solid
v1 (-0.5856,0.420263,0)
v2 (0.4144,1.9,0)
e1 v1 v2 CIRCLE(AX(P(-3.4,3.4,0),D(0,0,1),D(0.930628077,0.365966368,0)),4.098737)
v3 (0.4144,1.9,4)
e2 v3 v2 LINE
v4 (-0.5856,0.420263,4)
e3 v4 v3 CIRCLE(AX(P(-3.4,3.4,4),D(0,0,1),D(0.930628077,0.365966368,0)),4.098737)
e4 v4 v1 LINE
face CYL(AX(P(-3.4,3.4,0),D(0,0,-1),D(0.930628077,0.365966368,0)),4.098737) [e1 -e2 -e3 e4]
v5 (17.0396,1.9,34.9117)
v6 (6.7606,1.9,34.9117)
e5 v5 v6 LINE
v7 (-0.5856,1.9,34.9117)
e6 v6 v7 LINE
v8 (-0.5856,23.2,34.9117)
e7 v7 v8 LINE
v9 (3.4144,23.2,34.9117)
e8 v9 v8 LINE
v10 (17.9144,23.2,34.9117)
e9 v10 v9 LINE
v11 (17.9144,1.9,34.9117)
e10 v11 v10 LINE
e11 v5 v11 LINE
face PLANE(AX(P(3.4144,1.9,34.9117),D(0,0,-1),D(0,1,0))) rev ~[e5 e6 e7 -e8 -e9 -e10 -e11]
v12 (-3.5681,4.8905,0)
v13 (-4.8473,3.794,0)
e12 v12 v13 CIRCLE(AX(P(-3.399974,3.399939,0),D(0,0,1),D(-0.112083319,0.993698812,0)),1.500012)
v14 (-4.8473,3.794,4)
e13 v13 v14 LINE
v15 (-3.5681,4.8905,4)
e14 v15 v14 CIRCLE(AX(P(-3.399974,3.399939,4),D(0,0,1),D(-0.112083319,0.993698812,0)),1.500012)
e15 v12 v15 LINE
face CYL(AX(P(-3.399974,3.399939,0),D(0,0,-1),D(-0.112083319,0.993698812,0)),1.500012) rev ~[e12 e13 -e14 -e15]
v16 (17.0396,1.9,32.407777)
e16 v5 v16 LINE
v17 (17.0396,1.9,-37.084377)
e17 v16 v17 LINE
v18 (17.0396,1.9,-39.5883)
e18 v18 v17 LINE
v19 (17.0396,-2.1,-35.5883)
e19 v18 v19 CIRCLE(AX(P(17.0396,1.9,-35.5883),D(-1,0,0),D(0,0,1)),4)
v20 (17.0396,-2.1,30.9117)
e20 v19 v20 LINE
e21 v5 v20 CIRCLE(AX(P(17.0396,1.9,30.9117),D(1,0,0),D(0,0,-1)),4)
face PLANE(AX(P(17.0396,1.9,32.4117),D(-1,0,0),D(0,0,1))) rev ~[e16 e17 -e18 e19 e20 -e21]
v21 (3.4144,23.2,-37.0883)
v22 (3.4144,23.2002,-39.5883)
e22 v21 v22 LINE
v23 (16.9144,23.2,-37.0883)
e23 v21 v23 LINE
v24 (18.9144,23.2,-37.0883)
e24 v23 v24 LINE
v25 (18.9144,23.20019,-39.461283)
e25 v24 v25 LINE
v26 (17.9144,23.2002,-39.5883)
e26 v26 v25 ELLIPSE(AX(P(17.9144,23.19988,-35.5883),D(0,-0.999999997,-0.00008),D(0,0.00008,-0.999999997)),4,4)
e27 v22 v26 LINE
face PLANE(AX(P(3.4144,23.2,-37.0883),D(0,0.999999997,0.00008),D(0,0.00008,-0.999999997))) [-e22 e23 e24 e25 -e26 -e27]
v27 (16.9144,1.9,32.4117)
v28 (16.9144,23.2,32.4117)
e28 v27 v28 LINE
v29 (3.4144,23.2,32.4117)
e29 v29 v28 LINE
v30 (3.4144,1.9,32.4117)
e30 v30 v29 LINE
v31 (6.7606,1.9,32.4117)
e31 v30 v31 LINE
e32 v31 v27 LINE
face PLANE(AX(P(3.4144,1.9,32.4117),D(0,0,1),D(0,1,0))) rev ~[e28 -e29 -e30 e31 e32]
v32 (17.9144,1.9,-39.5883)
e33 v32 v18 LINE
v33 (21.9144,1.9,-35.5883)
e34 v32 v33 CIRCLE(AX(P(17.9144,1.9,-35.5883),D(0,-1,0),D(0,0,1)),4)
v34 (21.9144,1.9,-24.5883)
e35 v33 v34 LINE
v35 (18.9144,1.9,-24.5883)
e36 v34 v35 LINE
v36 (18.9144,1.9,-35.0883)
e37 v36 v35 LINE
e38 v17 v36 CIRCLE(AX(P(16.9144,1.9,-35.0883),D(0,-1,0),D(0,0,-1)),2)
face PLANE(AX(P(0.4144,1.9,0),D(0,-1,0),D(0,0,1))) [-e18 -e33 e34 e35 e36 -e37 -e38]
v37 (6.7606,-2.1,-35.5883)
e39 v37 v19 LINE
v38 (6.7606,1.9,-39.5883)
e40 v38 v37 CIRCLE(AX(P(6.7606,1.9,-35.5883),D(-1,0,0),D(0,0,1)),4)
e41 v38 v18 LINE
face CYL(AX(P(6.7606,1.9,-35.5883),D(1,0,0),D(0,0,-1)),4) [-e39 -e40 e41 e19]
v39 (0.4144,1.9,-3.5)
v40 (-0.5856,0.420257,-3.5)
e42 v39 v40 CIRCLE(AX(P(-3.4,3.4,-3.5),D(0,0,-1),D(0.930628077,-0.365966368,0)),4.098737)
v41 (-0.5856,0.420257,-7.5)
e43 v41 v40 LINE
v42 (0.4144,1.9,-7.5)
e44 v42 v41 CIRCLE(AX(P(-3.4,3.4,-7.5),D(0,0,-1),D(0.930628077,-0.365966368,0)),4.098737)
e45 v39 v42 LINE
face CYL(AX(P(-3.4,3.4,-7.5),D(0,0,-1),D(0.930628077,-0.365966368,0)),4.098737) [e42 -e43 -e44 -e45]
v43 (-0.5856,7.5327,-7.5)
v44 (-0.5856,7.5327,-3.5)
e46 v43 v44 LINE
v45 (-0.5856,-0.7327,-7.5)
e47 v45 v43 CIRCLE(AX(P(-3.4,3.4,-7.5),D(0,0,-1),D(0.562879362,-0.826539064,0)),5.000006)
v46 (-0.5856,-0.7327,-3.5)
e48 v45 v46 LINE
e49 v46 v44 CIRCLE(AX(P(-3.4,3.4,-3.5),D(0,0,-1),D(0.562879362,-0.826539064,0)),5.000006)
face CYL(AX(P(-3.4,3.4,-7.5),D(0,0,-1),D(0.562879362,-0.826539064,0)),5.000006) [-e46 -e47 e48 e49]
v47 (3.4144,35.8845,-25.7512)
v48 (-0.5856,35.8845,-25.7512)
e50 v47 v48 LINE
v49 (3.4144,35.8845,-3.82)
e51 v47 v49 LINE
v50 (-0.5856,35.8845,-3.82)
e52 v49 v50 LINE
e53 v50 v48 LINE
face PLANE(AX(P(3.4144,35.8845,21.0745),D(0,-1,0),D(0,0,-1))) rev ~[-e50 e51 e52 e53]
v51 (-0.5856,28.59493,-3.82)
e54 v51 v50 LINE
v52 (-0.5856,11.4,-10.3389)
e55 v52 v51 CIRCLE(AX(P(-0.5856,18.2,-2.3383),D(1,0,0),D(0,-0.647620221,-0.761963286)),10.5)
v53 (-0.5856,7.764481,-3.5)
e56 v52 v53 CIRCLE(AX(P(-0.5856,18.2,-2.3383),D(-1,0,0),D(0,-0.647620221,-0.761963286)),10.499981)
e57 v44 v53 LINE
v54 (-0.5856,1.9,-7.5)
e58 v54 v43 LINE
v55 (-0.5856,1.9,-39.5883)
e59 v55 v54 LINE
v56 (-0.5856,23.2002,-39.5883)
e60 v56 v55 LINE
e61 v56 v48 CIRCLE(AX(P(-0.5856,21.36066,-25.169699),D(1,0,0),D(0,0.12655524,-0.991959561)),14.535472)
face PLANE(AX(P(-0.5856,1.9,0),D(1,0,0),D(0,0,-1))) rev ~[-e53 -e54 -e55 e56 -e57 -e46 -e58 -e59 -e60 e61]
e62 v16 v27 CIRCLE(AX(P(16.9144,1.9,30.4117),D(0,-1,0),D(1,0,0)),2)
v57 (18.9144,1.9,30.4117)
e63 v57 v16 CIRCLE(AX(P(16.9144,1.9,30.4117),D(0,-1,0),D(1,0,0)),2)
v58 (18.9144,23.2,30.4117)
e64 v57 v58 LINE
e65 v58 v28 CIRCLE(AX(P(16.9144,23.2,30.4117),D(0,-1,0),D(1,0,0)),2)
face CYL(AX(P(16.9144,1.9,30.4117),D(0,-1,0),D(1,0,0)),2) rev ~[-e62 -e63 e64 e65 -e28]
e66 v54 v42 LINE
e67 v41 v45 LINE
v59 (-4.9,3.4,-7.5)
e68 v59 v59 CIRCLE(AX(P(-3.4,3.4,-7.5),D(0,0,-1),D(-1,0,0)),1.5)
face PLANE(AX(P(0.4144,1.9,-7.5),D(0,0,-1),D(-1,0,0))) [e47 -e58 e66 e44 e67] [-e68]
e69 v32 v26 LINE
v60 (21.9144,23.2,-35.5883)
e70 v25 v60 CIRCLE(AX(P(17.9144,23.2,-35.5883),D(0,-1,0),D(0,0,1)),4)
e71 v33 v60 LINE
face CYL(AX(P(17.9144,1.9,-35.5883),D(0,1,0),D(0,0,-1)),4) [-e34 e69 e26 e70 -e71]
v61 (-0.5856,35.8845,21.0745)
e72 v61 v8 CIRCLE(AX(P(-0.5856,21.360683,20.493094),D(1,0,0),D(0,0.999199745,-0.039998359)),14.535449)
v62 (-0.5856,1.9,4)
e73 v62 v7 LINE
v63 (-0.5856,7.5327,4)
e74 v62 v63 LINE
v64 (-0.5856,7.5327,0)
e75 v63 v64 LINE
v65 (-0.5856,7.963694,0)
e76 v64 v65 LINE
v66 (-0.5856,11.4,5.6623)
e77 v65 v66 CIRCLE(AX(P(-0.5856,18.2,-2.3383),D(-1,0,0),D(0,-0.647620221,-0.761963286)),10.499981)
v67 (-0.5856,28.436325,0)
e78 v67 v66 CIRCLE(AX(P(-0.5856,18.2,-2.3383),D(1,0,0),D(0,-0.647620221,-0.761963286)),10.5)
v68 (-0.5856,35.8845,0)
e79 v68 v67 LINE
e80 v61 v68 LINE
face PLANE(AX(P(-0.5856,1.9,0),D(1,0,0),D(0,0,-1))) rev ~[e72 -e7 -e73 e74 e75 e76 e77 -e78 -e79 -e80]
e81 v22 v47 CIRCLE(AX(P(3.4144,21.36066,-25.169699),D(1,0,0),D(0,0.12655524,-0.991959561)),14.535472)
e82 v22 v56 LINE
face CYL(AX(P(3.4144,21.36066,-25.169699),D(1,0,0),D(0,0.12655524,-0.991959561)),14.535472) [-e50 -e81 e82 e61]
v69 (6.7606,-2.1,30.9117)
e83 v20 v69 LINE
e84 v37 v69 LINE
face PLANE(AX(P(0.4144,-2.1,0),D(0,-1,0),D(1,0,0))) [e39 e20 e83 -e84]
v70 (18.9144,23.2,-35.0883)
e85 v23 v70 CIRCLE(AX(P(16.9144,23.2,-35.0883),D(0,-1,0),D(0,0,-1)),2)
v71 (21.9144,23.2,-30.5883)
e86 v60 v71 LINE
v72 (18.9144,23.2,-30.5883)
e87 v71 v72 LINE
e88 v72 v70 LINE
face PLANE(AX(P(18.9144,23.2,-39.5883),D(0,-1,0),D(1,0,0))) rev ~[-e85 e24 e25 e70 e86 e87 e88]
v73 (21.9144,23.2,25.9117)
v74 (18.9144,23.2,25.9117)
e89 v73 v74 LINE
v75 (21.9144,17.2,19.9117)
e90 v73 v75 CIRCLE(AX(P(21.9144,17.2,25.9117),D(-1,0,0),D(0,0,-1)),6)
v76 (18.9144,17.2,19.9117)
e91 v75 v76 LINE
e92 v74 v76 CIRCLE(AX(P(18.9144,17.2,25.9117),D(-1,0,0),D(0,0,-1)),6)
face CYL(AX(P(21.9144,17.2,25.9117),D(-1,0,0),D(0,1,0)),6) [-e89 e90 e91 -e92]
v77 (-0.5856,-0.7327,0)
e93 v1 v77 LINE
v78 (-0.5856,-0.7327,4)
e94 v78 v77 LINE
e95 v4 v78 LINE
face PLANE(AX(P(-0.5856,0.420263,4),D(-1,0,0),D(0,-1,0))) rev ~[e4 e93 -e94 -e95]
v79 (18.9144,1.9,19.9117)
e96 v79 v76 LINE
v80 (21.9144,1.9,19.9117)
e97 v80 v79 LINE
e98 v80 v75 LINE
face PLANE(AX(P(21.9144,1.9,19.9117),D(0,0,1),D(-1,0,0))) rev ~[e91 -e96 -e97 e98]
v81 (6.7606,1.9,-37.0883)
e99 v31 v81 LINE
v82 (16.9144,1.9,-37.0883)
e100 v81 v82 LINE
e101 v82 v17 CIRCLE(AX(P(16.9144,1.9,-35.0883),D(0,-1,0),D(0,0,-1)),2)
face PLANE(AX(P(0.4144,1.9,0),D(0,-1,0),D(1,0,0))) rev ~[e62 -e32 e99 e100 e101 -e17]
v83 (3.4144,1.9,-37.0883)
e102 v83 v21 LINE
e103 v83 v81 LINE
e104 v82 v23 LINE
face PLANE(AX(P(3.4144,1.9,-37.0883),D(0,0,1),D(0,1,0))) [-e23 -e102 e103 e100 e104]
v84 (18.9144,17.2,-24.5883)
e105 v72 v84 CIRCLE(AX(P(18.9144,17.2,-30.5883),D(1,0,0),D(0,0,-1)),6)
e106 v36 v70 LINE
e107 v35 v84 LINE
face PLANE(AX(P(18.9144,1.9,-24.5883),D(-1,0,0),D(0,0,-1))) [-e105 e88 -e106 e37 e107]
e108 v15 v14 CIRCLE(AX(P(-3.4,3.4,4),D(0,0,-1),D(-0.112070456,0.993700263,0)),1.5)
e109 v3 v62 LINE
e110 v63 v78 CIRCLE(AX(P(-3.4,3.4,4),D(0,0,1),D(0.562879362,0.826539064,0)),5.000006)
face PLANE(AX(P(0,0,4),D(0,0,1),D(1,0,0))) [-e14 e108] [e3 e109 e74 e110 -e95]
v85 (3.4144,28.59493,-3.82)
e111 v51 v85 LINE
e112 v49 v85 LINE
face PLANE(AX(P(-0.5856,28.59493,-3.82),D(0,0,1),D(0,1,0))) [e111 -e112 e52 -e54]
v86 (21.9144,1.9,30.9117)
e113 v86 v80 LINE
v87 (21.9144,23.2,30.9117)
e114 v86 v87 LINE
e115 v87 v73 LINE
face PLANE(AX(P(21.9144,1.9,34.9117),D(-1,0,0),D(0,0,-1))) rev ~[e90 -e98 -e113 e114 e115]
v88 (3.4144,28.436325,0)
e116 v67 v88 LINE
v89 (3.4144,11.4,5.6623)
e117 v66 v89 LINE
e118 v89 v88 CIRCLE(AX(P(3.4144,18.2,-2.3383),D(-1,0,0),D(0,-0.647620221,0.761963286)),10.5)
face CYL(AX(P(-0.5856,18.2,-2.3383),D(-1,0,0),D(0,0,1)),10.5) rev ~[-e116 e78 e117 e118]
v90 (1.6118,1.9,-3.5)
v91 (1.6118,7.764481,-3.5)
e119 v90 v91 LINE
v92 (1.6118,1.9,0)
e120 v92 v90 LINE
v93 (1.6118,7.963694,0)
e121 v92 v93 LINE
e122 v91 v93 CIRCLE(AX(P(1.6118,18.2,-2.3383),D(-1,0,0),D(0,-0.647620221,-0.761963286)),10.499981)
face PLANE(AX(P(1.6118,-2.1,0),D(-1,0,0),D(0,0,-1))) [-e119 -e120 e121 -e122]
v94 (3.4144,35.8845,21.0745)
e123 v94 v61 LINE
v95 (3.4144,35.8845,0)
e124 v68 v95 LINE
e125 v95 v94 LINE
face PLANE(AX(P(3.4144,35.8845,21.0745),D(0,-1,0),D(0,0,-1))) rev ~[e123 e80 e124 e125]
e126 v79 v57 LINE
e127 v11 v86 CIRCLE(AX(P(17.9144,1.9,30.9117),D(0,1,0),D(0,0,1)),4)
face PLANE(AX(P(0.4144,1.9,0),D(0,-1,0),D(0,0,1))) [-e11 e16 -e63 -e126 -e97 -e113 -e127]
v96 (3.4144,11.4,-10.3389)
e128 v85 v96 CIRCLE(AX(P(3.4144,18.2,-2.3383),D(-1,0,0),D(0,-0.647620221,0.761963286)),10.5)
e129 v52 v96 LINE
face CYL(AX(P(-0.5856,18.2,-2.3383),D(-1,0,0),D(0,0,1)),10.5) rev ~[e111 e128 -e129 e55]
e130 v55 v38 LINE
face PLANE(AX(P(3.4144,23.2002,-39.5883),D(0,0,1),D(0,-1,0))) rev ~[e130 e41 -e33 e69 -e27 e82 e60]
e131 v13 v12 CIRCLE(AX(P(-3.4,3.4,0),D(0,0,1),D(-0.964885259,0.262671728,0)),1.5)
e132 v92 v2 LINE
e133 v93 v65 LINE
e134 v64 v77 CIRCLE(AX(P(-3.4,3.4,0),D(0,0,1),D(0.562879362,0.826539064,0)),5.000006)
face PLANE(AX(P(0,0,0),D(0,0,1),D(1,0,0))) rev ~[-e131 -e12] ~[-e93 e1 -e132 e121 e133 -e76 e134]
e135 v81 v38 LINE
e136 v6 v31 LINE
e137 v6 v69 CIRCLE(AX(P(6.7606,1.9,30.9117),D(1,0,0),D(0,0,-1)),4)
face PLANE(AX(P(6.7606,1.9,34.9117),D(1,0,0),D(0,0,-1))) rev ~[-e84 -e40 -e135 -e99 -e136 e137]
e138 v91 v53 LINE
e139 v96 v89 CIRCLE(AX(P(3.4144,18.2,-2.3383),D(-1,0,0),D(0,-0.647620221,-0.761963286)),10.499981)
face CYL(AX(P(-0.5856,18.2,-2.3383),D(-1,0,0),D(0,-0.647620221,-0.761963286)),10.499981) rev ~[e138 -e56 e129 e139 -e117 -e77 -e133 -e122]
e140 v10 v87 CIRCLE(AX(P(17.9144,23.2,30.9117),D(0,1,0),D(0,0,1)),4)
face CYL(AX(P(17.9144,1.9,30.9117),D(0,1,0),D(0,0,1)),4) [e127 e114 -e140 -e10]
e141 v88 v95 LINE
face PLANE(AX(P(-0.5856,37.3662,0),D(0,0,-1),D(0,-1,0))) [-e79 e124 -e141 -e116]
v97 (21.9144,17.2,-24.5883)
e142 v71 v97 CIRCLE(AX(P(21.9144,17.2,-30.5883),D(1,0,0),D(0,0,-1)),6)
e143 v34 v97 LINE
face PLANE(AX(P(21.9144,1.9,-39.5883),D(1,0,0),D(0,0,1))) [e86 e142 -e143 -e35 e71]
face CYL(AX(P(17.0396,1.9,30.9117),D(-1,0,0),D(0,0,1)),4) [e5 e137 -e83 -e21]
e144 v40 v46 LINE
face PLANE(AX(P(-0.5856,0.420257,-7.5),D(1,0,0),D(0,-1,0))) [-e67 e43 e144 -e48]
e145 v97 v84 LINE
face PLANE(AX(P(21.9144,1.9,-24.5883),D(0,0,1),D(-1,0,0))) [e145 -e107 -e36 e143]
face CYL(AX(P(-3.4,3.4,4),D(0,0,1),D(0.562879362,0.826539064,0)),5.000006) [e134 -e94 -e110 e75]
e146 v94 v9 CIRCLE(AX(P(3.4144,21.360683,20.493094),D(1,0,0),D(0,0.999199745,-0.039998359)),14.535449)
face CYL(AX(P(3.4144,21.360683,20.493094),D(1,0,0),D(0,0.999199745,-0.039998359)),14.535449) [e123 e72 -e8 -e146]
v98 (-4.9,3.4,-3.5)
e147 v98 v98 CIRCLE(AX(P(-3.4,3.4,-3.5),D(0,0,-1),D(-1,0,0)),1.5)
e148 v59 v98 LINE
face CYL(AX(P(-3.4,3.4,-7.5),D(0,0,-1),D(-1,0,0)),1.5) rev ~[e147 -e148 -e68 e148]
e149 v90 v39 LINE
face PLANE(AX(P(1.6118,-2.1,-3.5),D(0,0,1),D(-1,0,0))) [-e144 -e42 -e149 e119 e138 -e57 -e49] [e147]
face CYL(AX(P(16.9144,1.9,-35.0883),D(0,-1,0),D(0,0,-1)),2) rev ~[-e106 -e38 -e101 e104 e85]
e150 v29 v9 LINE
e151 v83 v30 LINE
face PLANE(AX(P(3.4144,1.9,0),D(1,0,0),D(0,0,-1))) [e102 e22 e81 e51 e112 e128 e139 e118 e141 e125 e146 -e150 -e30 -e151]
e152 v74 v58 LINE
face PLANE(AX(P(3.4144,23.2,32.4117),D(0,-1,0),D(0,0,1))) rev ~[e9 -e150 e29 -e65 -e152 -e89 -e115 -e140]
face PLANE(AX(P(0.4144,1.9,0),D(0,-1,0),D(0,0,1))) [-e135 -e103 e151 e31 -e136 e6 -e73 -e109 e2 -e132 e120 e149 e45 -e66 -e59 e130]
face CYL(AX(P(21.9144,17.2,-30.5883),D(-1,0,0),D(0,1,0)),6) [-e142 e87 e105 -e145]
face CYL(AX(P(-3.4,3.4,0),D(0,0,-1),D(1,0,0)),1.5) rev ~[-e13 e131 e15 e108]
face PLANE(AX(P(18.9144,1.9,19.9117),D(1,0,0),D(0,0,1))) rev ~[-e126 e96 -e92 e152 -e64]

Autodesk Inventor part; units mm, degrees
ref_plane "YZ Plane" through (0, 0, 0) normal (1, 0, 0) x (0, 1, 0)
ref_plane "XZ Plane" through (0, 0, 0) normal (0, 1, 0) x (-1, 0, 0)
ref_plane "XY Plane" through (0, 0, 0) normal (0, 0, 1) x (1, 0, 0)
sketch "Эскиз1" plane through (0, 0, 0) normal (0, 0, 1) x (1, 0, 0)
  arc A0 (-3.5681, 4.8905) -> (-4.8473, 3.794) centre (-3.4, 3.4) ccw projected
  circle A1 centre (-3.4, 3.4) radius 1.5
  arc A2 (0.4144, 4.9) -> (0.4144, 1.9) centre (-3.4, 3.4) ccw
  line L0 (0.4144, 4.9) -> (0.4144, 1.9)
  point P0 (0, 0)
  point P1 (-4.8473, 3.794)
  point P2 (-3.5681, 4.8905)
extrude "Выдавливание1" add sketch "Эскиз1" along normal blind 4
sketch "Эскиз2" plane through (0.4144, 1.9, 0) normal (1, 0, 0) x (0, 0, -1)
  line L0 (0, 0) -> (0, 3) projected
  line L1 (0, 3) -> (-4, 3) projected
  line L2 (-4, 0) -> (-4, 3) projected
  line L3 (0, 0) -> (-4, 0) projected
  line L4 (0, 3) -> (-4, 3) projected
  line L5 (-4, 3) -> (7.5, 3)
  line L6 (7.5, 3) -> (7.5, 0)
  line L7 (7.5, 0) -> (-4, 0)
  line L8 (-4, 0) -> (-4, 3)
  point P0 (0, -1.9)
  point P1 (3, 1.9)
  dimension "d2" = 4
  dimension "d3" = 4.5
extrude "Выдавливание2" add sketch "Эскиз2" along normal blind 3
sketch "Эскиз3" plane through (0.4144, 1.9, -7.5) normal (0, 0, -1) x (-1, 0, 0)
  line L0 (0, 0) -> (0, 3) projected
  arc A0 (0, 0) -> (0, 3) centre (3.8144, 1.5) ccw projected
  circle A1 centre (3.8144, 1.5) radius 1.5 projected
  point P0 (0.4144, -1.9)
extrude "Выдавливание3" add sketch "Эскиз3" against normal blind 4
sketch "Эскиз4" plane through (3.4144, 1.9, 0) normal (1, 0, 0) x (0, 0, -1)
  line L0 (6.3383, 0) -> (-1.6617, 0) projected
  line L1 (39.5883, 0) -> (-34.9117, 0)
  line L2 (-34.9117, 0) -> (-34.9117, 21.3)
  line L3 (-21.0745, 33.9845) -> (25.7512, 33.9845)
  line L4 (39.5883, 21.3002) -> (39.5883, 0)
  line L5 (-31.9117, 21.3) -> (-31.9117, 4.3) projected
  line L6 (36.5883, 4.3) -> (36.5883, 21.3) projected
  line L7 (24.5883, 33.3) -> (-19.9117, 33.3) projected
  arc A0 (-19.9117, 33.9845) -> (-34.9117, 21.3) centre (-20.4931, 19.4607) ccw
  circle A1 centre (2.3383, 16.3) radius 0.9967 projected
  line L8 (2.3383, 16.3) -> (2.3383, 42.847) construction
  arc A2 (39.5883, 21.3) -> (24.5883, 33.9845) centre (25.1697, 19.4607) ccw
  point P0 (0, -1.9)
  point P1 (-1.6617, 0)
  dimension "d8" = 3
  dimension "d9" = 3
extrude "Выдавливание4" add sketch "Эскиз4" against normal blind 4 contours L0 L1 L2 A0 L3 A2 L4
sketch "Эскиз5" plane through (-0.5856, 1.9, 0) normal (-1, 0, 0) x (0, 0, 1)
  arc A0 (-10.3389, 9.5) -> (5.6623, 9.5) centre (-2.3383, 16.3) ccw projected
  circle A1 centre (-2.3383, 16.3) radius 0.9967 projected
  circle A2 centre (-2.3383, 16.3) radius 10.5
  point P0 (0, -1.9)
  point P1 (5.6623, 9.5)
  point P2 (-10.3389, 9.5)
extrude "Выдавливание5" cut sketch "Эскиз5" against normal blind 4
sketch "Эскиз6" plane through (3.4144, 1.9, 0) normal (1, 0, 0) x (0, 0, -1)
  circle A0 centre (2.3383, 16.3) radius 10.5 projected
  line L0 (-34.9117, 0) -> (39.5883, 0) projected
  line L1 (39.5883, 0) -> (39.5883, 21.3002) projected
  arc A1 (39.5883, 21.3002) -> (25.7512, 33.9845) centre (25.1697, 19.4607) ccw projected
  line L2 (25.7512, 33.9845) -> (-21.0745, 33.9845) projected
  arc A2 (-21.0745, 33.9845) -> (-34.9117, 21.3) centre (-20.4931, 19.4607) ccw projected
  line L3 (-34.9117, 21.3) -> (-34.9117, 0) projected
  line L4 (-34.9117, 0) -> (-32.4117, 0)
  line L5 (-32.4117, 0) -> (-32.4117, 21.3)
  line L6 (-32.4117, 21.3) -> (-34.9117, 21.3)
  line L7 (-34.9117, 21.3) -> (-34.9117, 0)
  line L8 (39.5883, 0) -> (39.5883, 21.3002) projected
  line L9 (39.5883, 0) -> (37.0883, 0)
  line L10 (37.0883, 0) -> (37.0883, 21.3)
  line L11 (37.0883, 21.3) -> (39.5883, 21.3)
  line L12 (39.5883, 21.3) -> (39.5883, 0)
  point P0 (0, -1.9)
  dimension "d14" = 2.5
  dimension "d15" = 2.5
extrude "Выдавливание6" add sketch "Эскиз6" along normal blind 15.5 contours L3 L6 L5 L0 | L10 L11 L1 L0
sketch "Эскиз7" plane through (-0.5856, 1.9, 0) normal (-1, 0, 0) x (0, 0, 1)
  circle A0 centre (-2.3383, 16.3) radius 10.5 projected
  line L0 (-3.82, 35.4662) -> (0, 35.4662)
  line L1 (0, 35.4662) -> (0, 24.6625)
  line L2 (0, 24.6625) -> (-3.82, 24.6625)
  line L3 (-3.82, 24.6625) -> (-3.82, 35.4662)
  point P0 (0, -1.9)
  point P1 (-3.82, 26.6949)
  point P2 (0, 26.5363)
extrude "Выдавливание7" cut sketch "Эскиз7" against normal blind 15.5 contours A0 L3 L0 L1
sketch "Эскиз8" plane through (0.4144, 1.9, 0) normal (0, -1, 0) x (1, 0, 0)
  line L0 (3, 32.4117) -> (18.5, 32.4117) projected
  line L1 (3, -37.0883) -> (18.5, -37.0883) projected
  line L2 (16.6252, 32.4117) -> (6.3462, 32.4117)
  line L3 (6.3462, 32.4117) -> (6.3462, -37.0883)
  line L4 (6.3462, -37.0883) -> (16.6252, -37.0883)
  line L5 (16.6252, -37.0883) -> (16.6252, 32.4117)
  line L6 (18.5, 34.9117) -> (-1, 34.9117) projected
  line L7 (16.6252, 34.9117) -> (6.3462, 34.9117)
  line L8 (6.3462, 34.9117) -> (6.3462, 32.4117)
  line L9 (6.3462, 32.4117) -> (16.6252, 32.4117)
  line L10 (16.6252, 32.4117) -> (16.6252, 34.9117)
  line L11 (-1, -39.5883) -> (18.5, -39.5883) projected
  line L12 (16.6252, -37.0883) -> (6.3462, -37.0883)
  line L13 (6.3462, -37.0883) -> (6.3462, -39.5883)
  line L14 (6.3462, -39.5883) -> (16.6252, -39.5883)
  line L15 (16.6252, -39.5883) -> (16.6252, -37.0883)
  point P0 (-0.4144, 0)
  point P1 (6.3462, -37.0883)
extrude "Выдавливание8" add sketch "Эскиз8" along normal blind 4
fillet "Сопряжение1" radius 4 2 edges at (11.9001, -2.1, -39.5883) (11.9001, -2.1, 34.9117)
sketch "Эскиз9" plane through (18.9144, 1.9, -39.5883) normal (0, -1, 0) x (1, 0, 0)
  line L0 (-15.5, 74.5) -> (0, 74.5) projected
  line L1 (0, 74.5) -> (3, 74.5)
  line L2 (3, 74.5) -> (3, 59.5)
  line L3 (3, 59.5) -> (0, 59.5)
  line L4 (0, 59.5) -> (0, 74.5)
  line L5 (0, 2.5) -> (0, 0) projected
  line L6 (0, 0) -> (3, 0)
  line L7 (3, 0) -> (3, 15)
  line L8 (3, 15) -> (0, 15)
  line L9 (0, 15) -> (0, 0)
  point P0 (-18.9144, 39.5883)
  dimension "d23" = 3
  dimension "d24" = 15
  dimension "d25" = 15
extrude "Выдавливание9" add sketch "Эскиз9" against normal blind 21.3
fillet "Сопряжение2" radius 4 2 edges at (21.9144, 12.55, -39.5883) (21.9144, 12.55, 34.9117)
fillet "Сопряжение3" radius 2 2 edges at (18.9144, 12.55, 32.4117) (18.9144, 12.55, -37.0883)
fillet "Сопряжение4" radius 6 2 edges at (20.4144, 23.2, 19.9117) (20.4144, 23.2, -24.5883)
sketch "Эскиз10" plane through (0.4144, 1.9, -7.5) normal (0, 0, -1) x (-1, 0, 0)
  circle A0 centre (3.8144, 1.5) radius 1.5 projected
  arc A1 (0, 0) -> (1, 4.4797) centre (3.8144, 1.5) ccw projected
  arc A2 (1, -2.6327) -> (1, 5.6327) centre (3.8144, 1.5) ccw
  line L0 (1, 0) -> (1, 21.3) projected
  line L1 (1, 6.5) -> (1, -2.6327)
  point P0 (0.4144, -1.9)
  point P1 (1, -1.4797)
  dimension "d31" = 10
extrude "Выдавливание10" add sketch "Эскиз10" against normal blind 4 contours A1 L0 A2 L1
sketch "Эскиз11" plane through (0, 0, 4) normal (0, 0, 1) x (1, 0, 0)
  arc A0 (-0.5856, 7.5327) -> (-0.5856, -0.7327) centre (-3.4, 3.4) ccw projected
  circle A1 centre (-3.4, 3.4) radius 1.5 projected
  circle A2 centre (-3.4, 3.4) radius 5
  line L0 (-0.5856, 1.9) -> (-0.5856, 7.5327) projected
  line L1 (-0.5856, 7.5327) -> (-0.5856, -0.7327)
  circle A3 centre (-3.4, 3.4) radius 1.5 projected
  line L2 (0.4144, 1.9) -> (-0.5856, 1.9) projected
  line L3 (-0.5856, 1.9) -> (-0.5856, 6.3797) projected
  arc A4 (-0.5856, 6.3797) -> (0.4144, 1.9) centre (-3.4, 3.4) ccw projected
  point P0 (0, 0)
  point P1 (-0.5856, 0.4203)
extrude "Выдавливание11" add sketch "Эскиз11" against normal blind 4 contours L0 A4 L1 A0
sketch "Эскиз12" plane through (0.4144, -2.1, 0) normal (0, -1, 0) x (1, 0, 0)
  line L0 (-1, -3.5) -> (-1, 0) projected
  line L1 (3, 0) -> (-1, 0) projected
  line L2 (-1, 0) -> (1.1974, 0)
  line L3 (1.1974, 0) -> (1.1974, -3.5)
  line L4 (1.1974, -3.5) -> (-1, -3.5)
  line L5 (-1, -3.5) -> (-1, 0)
  point P0 (-0.4144, 0)
extrude "Выдавливание12" cut sketch "Эскиз12" against normal blind 21.5
properties part number "cam_hold_logitech"
